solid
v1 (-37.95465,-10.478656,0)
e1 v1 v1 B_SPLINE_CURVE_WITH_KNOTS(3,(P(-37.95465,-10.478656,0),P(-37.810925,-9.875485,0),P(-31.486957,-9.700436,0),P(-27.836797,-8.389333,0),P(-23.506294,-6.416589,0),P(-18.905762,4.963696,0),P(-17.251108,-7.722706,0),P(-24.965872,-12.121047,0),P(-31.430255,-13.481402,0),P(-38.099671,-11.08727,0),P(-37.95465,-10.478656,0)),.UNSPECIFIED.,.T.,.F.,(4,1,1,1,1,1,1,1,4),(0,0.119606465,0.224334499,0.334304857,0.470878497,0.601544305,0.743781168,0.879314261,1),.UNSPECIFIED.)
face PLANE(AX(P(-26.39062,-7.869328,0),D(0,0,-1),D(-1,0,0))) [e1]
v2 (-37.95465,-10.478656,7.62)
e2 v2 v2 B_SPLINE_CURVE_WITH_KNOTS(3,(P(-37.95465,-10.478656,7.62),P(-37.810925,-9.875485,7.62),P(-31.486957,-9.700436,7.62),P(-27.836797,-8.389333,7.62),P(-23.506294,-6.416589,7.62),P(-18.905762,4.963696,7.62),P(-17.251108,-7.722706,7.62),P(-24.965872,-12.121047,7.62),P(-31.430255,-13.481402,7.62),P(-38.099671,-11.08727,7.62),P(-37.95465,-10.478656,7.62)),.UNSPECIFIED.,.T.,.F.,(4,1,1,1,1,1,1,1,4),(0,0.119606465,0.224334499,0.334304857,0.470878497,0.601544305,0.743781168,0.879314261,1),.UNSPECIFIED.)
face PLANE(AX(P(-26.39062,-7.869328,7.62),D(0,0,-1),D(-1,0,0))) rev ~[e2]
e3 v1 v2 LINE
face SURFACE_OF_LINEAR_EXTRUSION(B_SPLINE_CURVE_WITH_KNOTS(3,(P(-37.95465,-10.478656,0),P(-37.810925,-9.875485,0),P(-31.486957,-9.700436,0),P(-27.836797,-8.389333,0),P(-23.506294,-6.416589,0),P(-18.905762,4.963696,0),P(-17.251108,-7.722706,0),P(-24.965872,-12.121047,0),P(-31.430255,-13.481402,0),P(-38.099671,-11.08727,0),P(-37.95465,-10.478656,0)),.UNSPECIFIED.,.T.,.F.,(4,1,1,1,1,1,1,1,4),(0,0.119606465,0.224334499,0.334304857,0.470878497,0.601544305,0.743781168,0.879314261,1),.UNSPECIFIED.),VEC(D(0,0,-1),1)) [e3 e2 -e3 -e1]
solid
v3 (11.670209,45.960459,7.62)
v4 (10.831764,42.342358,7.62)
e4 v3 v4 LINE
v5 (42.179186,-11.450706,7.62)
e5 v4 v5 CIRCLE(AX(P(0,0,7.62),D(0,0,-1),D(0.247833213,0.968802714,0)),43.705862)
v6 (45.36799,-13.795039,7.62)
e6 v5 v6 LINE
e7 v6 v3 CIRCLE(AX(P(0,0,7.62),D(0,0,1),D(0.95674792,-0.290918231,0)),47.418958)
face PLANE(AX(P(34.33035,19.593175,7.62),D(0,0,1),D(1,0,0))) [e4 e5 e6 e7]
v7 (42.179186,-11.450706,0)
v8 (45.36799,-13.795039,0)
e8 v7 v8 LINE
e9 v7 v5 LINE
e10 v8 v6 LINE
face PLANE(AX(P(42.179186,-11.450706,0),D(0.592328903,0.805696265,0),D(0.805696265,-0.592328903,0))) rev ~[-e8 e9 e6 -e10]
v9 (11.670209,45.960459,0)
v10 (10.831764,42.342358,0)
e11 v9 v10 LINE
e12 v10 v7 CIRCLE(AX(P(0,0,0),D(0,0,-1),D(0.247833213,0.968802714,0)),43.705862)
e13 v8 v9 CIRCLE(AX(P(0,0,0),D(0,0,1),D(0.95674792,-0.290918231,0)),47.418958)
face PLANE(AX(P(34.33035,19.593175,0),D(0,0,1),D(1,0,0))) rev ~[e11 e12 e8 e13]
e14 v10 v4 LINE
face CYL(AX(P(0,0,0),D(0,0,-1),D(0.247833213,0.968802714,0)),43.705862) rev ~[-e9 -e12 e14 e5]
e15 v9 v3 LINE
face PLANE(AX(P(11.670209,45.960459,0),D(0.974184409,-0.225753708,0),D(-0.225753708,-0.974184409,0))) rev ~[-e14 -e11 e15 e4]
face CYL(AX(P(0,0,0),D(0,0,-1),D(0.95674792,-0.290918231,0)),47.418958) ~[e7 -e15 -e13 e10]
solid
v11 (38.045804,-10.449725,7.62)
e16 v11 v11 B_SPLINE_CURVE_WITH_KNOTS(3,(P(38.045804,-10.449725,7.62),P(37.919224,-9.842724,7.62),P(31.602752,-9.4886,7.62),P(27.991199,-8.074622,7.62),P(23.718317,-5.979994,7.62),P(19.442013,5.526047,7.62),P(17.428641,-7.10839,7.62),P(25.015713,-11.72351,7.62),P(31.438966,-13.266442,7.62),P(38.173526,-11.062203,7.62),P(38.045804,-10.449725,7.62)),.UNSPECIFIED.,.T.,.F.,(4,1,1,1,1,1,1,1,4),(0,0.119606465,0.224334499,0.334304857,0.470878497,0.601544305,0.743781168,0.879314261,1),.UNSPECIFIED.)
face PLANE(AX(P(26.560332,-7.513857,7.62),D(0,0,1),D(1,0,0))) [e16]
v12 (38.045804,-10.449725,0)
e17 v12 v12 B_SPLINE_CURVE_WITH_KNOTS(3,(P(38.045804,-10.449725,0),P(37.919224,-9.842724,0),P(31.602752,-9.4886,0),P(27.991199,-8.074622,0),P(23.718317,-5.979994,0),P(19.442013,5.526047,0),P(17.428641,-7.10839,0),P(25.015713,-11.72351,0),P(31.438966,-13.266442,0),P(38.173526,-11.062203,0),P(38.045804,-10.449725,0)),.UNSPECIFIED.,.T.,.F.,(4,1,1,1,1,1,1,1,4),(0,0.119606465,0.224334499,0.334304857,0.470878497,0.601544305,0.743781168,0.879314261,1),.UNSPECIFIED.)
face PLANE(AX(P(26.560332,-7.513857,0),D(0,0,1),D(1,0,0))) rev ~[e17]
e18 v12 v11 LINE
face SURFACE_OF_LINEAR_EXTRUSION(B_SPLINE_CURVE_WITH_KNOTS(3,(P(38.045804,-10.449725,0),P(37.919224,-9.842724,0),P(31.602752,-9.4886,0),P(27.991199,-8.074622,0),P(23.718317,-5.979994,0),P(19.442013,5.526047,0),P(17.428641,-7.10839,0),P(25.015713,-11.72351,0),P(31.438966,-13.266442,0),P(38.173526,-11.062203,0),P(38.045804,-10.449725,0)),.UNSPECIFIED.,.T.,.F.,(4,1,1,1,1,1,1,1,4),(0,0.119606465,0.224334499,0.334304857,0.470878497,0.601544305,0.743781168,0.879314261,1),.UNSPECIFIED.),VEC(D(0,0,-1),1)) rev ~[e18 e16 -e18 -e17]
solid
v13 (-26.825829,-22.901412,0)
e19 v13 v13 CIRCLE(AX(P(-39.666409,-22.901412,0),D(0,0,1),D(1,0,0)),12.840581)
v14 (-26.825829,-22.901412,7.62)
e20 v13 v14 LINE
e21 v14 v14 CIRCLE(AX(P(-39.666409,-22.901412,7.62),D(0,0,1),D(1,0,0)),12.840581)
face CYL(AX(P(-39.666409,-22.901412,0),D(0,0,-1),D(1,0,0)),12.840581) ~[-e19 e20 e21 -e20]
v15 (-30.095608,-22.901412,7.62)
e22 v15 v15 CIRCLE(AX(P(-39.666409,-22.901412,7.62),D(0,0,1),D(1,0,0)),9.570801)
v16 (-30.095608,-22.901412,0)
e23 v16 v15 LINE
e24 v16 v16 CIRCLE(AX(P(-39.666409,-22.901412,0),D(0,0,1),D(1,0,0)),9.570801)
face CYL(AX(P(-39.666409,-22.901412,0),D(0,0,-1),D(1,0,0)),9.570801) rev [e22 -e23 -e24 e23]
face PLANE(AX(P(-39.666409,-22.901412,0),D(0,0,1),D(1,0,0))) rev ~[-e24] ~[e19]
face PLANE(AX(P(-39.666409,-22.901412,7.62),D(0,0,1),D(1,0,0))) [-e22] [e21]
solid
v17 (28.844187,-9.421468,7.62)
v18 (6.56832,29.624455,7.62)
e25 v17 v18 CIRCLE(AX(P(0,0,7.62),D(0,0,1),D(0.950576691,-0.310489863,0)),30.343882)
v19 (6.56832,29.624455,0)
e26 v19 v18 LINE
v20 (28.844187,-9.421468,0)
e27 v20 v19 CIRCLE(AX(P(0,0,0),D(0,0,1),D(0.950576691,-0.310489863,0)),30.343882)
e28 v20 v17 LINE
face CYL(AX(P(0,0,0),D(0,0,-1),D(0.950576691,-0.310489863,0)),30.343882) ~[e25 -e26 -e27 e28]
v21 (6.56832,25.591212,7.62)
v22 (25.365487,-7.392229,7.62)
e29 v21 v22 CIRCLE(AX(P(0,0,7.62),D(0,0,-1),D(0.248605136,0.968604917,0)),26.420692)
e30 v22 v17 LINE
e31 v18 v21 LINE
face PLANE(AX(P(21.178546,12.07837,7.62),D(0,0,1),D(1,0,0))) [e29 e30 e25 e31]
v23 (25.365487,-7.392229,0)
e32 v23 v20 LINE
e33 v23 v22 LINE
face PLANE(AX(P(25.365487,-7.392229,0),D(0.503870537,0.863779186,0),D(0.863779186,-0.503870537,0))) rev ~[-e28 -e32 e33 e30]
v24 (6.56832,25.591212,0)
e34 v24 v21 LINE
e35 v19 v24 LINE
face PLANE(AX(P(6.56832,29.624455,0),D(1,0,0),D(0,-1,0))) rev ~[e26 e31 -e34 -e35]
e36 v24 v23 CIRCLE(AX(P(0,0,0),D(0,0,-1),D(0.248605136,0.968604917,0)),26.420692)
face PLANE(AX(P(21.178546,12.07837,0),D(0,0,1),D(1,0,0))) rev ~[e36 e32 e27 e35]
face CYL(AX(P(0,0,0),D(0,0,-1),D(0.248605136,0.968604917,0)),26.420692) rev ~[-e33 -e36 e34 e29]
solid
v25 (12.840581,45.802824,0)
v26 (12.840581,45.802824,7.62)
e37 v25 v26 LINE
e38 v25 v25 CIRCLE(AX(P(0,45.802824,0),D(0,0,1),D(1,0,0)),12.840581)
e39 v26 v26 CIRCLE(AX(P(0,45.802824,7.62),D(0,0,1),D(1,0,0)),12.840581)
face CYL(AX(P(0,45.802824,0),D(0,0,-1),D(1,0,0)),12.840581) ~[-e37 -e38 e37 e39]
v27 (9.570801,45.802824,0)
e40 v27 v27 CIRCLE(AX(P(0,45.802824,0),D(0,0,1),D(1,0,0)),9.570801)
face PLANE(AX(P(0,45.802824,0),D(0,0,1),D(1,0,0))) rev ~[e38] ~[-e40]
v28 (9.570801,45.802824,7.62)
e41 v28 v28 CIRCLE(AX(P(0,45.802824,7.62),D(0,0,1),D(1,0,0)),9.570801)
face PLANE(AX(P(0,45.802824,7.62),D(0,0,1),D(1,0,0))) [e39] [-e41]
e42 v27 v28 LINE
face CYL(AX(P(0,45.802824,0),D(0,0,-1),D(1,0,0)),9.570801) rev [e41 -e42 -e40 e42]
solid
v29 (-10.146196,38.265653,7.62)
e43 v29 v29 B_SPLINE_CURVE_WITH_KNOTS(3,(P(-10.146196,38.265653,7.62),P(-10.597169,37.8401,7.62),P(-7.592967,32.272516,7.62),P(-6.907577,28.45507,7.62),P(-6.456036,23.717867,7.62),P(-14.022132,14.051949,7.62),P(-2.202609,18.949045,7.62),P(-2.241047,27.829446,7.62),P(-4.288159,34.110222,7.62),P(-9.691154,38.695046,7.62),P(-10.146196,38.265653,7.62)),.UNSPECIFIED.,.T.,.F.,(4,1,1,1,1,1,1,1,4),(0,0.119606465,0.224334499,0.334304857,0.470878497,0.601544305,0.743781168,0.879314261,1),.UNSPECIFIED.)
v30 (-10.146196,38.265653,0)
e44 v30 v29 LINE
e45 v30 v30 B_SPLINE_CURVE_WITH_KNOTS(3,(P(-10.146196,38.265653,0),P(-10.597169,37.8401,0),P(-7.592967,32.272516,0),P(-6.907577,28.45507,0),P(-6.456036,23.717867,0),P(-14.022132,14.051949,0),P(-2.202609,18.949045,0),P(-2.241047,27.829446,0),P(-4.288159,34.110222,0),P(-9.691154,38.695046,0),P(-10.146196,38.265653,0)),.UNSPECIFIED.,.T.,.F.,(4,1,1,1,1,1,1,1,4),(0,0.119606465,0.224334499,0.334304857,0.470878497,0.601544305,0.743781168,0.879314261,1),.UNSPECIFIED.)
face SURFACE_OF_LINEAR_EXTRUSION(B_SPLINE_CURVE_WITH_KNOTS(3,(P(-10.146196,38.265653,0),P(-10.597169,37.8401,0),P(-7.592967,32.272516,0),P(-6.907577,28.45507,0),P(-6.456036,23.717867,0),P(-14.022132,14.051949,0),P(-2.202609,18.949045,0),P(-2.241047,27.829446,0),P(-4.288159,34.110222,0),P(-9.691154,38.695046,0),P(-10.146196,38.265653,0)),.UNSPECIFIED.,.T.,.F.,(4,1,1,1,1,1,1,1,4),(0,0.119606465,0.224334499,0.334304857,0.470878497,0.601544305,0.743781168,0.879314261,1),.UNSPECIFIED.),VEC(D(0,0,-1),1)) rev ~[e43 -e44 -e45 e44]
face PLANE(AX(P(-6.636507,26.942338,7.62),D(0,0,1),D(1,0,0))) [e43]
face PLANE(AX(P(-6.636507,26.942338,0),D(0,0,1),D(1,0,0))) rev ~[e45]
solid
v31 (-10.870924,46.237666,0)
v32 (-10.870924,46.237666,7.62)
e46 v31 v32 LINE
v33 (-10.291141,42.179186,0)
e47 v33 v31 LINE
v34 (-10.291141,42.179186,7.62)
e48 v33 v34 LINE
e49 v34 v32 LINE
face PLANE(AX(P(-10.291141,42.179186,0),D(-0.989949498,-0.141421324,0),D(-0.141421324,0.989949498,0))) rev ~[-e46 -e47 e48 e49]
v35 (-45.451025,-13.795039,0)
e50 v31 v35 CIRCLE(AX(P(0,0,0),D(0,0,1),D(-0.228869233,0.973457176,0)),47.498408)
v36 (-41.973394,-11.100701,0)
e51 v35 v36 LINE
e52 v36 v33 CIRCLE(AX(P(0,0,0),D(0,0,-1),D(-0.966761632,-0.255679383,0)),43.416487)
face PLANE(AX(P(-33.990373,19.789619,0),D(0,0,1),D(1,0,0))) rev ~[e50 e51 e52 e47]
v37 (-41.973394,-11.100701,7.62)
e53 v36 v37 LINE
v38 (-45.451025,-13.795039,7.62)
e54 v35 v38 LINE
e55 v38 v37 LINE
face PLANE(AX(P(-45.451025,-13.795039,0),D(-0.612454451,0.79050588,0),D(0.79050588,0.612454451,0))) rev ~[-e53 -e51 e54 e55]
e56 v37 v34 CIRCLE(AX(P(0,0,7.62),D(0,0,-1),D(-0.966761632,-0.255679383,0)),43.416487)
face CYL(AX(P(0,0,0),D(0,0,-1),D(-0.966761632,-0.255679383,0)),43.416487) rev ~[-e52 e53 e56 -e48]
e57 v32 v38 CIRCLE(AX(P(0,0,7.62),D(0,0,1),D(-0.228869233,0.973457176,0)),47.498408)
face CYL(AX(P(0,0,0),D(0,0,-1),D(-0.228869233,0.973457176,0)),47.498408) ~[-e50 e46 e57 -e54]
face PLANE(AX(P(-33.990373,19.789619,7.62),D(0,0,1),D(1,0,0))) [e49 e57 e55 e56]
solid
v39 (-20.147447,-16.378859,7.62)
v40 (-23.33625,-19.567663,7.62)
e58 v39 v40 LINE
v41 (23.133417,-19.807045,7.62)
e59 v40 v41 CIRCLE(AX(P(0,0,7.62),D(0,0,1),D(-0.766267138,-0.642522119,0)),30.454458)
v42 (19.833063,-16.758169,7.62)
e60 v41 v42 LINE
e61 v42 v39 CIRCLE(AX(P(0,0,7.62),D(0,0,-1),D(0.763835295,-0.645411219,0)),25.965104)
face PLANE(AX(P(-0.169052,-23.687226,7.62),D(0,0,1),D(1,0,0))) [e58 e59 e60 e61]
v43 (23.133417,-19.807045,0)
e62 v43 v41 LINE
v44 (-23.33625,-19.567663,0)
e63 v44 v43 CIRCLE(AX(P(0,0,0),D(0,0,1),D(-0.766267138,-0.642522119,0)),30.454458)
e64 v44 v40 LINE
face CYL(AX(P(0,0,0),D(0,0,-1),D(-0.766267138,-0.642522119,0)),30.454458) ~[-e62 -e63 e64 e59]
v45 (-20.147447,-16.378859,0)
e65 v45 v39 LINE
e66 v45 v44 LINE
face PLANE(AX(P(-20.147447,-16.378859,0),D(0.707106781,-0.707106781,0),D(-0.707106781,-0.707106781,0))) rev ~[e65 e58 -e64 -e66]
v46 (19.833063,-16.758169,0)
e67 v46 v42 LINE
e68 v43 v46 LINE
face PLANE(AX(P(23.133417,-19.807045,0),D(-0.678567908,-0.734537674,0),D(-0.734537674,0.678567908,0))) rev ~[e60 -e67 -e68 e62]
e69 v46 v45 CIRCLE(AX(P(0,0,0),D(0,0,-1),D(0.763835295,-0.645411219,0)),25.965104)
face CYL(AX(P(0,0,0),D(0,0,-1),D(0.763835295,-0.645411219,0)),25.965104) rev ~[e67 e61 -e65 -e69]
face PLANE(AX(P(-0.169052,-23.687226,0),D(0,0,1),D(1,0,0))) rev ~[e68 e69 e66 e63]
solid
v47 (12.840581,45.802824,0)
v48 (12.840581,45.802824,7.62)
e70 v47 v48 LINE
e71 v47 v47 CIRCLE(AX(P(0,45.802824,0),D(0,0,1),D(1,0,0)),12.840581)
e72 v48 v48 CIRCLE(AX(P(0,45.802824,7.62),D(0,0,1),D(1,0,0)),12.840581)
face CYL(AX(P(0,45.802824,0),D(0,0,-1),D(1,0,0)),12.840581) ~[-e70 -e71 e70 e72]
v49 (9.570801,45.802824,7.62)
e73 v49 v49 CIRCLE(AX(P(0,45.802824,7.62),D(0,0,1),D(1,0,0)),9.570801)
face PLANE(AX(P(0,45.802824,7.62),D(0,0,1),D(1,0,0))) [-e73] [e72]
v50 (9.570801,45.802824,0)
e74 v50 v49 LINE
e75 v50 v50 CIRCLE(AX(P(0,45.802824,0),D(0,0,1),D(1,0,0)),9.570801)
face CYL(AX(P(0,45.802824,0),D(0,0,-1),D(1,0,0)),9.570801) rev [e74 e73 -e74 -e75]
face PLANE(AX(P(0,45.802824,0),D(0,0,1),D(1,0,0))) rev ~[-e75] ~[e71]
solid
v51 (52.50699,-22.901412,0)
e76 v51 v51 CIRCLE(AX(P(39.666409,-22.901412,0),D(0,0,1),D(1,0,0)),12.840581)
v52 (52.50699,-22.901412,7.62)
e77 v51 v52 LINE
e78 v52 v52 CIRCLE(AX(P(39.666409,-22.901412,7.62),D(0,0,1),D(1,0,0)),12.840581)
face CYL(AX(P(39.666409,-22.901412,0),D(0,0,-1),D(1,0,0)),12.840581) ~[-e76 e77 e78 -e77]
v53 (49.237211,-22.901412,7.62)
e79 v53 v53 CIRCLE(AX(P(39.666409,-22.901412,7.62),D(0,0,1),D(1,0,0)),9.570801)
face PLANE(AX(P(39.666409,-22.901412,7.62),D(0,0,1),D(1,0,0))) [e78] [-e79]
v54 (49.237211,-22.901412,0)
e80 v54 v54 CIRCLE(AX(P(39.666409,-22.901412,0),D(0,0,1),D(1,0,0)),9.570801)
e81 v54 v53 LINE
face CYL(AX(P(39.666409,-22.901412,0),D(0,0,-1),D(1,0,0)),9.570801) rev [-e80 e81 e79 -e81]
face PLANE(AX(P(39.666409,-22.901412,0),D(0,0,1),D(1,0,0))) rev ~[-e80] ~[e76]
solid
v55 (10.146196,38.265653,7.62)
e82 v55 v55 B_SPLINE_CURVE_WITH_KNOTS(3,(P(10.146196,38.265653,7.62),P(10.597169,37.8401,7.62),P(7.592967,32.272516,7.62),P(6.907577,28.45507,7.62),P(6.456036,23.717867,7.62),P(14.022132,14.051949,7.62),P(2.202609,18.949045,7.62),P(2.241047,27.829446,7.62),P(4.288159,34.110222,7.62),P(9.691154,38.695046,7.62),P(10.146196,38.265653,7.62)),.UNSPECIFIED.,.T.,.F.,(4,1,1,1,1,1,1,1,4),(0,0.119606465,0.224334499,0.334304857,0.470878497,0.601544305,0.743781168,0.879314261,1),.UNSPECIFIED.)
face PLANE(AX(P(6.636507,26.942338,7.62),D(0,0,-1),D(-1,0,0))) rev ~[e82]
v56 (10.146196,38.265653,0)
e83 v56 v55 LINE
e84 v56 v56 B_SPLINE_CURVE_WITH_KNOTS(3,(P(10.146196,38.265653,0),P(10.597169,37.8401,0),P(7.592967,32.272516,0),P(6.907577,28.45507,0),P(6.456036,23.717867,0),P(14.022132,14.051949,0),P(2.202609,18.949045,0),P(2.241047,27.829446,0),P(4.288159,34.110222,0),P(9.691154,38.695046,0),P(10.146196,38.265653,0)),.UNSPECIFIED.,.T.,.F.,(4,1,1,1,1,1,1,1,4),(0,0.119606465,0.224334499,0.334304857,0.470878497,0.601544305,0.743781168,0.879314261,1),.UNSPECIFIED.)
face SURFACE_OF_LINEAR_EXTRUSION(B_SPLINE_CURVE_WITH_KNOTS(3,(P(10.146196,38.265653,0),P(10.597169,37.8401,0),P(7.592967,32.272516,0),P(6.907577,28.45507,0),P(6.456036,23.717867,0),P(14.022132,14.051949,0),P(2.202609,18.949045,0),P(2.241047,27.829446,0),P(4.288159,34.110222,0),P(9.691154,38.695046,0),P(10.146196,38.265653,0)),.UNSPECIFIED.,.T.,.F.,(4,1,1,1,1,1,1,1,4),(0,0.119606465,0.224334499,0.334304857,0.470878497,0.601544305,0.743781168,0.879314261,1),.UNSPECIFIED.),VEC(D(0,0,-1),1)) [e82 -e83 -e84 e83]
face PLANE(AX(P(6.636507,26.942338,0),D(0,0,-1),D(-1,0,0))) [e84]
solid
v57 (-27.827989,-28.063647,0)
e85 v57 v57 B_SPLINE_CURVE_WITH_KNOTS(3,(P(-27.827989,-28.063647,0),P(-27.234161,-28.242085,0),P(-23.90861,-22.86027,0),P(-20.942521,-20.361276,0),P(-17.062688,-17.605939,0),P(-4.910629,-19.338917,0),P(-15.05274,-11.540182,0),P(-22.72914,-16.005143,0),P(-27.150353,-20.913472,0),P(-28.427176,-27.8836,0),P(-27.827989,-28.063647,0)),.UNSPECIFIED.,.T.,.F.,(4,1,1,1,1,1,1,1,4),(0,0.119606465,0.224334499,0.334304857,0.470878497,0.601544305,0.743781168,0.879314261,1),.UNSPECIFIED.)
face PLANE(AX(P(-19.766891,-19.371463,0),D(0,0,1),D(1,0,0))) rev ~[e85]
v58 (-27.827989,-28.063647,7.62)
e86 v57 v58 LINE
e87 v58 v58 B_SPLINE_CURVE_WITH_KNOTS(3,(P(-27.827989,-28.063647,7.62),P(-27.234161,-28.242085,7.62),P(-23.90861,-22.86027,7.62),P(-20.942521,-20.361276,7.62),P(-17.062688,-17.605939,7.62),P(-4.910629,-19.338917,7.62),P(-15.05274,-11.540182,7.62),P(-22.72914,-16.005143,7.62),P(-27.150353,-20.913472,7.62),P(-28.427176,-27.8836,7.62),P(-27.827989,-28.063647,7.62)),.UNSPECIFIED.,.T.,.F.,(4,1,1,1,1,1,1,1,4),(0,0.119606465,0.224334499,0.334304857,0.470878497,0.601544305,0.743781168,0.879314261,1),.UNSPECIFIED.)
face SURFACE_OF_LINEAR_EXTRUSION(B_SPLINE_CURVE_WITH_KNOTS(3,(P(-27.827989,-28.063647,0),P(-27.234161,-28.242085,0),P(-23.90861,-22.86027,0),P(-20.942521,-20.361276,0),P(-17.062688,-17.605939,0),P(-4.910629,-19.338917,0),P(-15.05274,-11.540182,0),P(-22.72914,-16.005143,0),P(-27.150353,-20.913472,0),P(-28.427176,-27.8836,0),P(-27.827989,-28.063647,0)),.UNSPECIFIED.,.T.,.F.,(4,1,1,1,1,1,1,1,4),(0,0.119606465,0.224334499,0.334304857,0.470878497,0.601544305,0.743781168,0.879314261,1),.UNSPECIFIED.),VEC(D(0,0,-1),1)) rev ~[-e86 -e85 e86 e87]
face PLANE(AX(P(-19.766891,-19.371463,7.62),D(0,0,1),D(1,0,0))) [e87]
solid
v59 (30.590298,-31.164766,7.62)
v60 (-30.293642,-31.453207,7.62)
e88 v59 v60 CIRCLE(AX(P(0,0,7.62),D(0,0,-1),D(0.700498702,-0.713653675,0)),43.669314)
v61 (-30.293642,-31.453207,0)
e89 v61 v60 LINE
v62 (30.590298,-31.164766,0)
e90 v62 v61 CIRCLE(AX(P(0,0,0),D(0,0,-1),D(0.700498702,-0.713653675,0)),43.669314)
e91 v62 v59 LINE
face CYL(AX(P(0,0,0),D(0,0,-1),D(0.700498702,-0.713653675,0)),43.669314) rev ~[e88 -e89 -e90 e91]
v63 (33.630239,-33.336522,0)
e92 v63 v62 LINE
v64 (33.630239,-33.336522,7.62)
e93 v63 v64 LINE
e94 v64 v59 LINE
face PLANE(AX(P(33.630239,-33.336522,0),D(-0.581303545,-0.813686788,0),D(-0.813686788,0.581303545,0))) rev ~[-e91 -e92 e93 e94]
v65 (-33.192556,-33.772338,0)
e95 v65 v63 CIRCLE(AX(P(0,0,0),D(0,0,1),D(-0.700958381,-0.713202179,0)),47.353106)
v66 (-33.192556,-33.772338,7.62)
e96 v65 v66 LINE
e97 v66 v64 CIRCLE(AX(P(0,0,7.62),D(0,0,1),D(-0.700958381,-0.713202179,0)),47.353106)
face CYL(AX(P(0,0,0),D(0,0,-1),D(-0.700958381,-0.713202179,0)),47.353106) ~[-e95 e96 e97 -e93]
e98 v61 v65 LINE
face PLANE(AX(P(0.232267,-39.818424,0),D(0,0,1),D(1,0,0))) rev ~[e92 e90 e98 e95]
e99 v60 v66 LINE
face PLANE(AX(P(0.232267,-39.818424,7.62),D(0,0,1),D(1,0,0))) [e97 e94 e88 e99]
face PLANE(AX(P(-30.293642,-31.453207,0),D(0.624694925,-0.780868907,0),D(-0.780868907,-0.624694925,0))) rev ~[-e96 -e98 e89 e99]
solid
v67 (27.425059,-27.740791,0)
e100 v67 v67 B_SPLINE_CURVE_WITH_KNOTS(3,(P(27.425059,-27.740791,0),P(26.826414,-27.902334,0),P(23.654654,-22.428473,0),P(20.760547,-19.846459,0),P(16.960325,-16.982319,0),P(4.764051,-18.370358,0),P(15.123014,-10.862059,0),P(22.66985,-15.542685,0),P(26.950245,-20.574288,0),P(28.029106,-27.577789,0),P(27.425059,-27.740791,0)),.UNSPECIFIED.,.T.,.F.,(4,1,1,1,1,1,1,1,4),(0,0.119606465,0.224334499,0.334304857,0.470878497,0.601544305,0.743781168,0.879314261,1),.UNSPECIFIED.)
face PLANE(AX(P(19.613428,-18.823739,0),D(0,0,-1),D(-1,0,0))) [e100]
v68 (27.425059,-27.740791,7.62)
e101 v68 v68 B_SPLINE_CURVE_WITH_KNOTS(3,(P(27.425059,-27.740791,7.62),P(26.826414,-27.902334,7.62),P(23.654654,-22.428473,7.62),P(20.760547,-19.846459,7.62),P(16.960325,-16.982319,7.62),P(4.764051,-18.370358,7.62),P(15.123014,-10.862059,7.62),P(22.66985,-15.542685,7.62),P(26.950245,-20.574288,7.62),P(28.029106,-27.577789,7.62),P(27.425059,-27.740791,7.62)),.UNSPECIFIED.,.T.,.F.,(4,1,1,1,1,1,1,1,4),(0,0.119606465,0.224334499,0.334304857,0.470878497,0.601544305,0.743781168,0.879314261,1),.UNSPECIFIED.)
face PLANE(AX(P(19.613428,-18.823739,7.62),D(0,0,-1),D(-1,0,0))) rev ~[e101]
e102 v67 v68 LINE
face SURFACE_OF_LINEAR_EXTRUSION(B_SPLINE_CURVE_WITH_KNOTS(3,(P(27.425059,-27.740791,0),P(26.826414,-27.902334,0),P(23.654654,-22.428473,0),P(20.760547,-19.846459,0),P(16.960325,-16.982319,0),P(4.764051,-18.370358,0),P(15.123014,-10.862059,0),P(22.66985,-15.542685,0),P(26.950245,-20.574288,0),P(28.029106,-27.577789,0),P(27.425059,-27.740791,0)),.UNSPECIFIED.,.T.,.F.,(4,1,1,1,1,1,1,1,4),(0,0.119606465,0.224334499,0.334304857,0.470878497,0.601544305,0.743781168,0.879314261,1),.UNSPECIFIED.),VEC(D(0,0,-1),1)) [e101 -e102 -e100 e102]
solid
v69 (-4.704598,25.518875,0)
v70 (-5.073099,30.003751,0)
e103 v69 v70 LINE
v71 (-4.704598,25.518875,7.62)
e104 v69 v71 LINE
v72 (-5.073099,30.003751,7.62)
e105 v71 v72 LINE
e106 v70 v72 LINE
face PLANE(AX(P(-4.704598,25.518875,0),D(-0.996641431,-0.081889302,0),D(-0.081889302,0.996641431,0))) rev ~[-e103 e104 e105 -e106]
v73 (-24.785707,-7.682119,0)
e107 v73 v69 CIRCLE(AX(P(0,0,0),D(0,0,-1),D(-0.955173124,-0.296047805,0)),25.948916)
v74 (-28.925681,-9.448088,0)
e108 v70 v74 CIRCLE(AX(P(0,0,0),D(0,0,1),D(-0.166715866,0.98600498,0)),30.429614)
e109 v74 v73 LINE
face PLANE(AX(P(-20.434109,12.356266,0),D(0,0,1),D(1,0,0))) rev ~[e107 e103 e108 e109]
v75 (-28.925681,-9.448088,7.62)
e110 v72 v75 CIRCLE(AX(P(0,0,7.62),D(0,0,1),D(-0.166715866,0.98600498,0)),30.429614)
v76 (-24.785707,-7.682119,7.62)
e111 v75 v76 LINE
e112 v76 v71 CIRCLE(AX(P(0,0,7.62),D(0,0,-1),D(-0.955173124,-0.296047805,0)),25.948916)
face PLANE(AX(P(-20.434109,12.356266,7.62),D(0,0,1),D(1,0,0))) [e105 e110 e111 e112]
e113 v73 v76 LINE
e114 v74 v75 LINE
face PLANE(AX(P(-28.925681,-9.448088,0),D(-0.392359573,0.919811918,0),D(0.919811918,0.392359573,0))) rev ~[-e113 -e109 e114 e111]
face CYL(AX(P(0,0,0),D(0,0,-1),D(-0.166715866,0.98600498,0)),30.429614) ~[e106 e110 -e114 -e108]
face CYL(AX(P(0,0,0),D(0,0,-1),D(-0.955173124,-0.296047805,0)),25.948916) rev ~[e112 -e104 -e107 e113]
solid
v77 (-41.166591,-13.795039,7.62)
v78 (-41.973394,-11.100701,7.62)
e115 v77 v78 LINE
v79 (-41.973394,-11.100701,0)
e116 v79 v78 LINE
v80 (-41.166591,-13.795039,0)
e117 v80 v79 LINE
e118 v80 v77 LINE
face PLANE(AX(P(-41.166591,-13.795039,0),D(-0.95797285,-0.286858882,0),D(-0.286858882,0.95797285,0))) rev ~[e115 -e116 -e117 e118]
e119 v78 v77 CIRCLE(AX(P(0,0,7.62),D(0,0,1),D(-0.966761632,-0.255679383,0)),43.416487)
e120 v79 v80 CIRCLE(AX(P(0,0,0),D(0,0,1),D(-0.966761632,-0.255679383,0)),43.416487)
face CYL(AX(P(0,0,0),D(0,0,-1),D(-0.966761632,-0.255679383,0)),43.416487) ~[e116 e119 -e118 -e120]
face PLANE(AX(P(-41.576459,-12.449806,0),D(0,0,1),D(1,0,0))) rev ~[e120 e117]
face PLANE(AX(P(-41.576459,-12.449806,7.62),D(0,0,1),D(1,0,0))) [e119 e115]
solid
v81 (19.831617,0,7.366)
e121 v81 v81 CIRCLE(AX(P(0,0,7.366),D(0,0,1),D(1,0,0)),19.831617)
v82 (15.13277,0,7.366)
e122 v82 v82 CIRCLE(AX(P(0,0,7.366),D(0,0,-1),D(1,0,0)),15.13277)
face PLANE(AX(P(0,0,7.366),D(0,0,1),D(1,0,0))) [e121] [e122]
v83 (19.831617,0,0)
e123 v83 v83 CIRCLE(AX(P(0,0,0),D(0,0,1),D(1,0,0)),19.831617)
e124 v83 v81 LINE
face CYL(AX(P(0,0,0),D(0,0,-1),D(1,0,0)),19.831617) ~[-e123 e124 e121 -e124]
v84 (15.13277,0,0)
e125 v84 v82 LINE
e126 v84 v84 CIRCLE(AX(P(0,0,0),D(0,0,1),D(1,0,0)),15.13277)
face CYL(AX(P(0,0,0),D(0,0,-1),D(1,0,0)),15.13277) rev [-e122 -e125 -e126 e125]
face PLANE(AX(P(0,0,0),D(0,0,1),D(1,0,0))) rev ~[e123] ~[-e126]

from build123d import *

# Parameters (mm, degrees)
F0_R      = 19.8316168412
F1_DEPTH  = 7.366
F2_R      = 15.1327699345
F3_DEPTH  = 8.89
F4_R      = 12.8405806387
F4_R_2    = 9.5708012392
F5_DEPTH  = 7.62
F7_DEPTH  = 7.62
F8_DEPTH  = 7.62
F10_DEPTH = 7.62
F12_DEPTH = 7.62


# Not quite as in the source:
# - a feature of the source that left no trace in its solid (it failed there, or was rolled back) is left out
# - a feature names something its author has since deleted; it is built from what else it names


with BuildPart() as f1:
    # F0 (on Top) → F1 (new body)
    with BuildSketch(Plane.XY):
        Circle(F0_R)
    extrude(amount=F1_DEPTH)

    # F2 (on Top) → F3 (cut)
    with BuildSketch(Plane.XY):
        Circle(F2_R)
    extrude(amount=F3_DEPTH, mode=Mode.SUBTRACT)


with BuildPart() as f5:
    # F4 (on Top) → F5 (new body)
    with BuildSketch(Plane.XY):
        with Locations((0, 45.8028241992)):
            Circle(F4_R)
        with Locations((0, 45.8028241992)):
            Circle(F4_R_2, mode=Mode.SUBTRACT)
    extrude(amount=F5_DEPTH)


with BuildPart() as f7:
    # F6 (on Top) → F7 (new body)
    with BuildSketch(Plane.XY):
        with BuildLine():
            add(Edge.make_bspline(
                [(-10.1461960003, 38.2656529546), (-10.5971686857, 37.8400995519), (-7.5929666267, 32.2725156605), (-6.9075768698, 28.4550696213), (-6.4560361932, 23.7178665225), (-14.0221319892, 14.0519491431), (-2.2026089144, 18.9490453351), (-2.2410472149, 27.8294457935), (-4.2881589957, 34.1102219148), (-9.6911539418, 38.6950463582), (-10.1461960003, 38.2656529546)],
                knots=[0, 0, 0, 0, 0.1196064646, 0.2243344987, 0.3343048571, 0.4708784974, 0.6015443046, 0.7437811682, 0.8793142609, 1, 1, 1, 1], degree=3))
        make_face()
    extrude(amount=F7_DEPTH)


with BuildPart() as f7b:
    # F6 (on Top) → F7, piece 2 (new body)
    with BuildSketch(Plane.XY):
        with BuildLine():
            add(Edge.make_bspline(
                [(10.1461960003, 38.2656529546), (10.5971686857, 37.8400995519), (7.5929666267, 32.2725156605), (6.9075768698, 28.4550696213), (6.4560361932, 23.7178665225), (14.0221319892, 14.0519491431), (2.2026089144, 18.9490453351), (2.2410472149, 27.8294457935), (4.2881589957, 34.1102219148), (9.6911539418, 38.6950463582), (10.1461960003, 38.2656529546)],
                knots=[0, 0, 0, 0, 0.1196064646, 0.2243344987, 0.3343048571, 0.4708784974, 0.6015443046, 0.7437811682, 0.8793142609, 1, 1, 1, 1], degree=3))
        make_face()
    extrude(amount=F7_DEPTH)


with BuildPart() as f7c:
    # F6 (on Top) → F7, piece 3 (new body)
    with BuildSketch(Plane.XY):
        with BuildLine():
            add(Edge.make_bspline(
                [(38.0458038622, -10.4497247993), (37.9192240951, -9.8427242852), (31.6027522683, -9.488599928), (27.9911987139, -8.074621744), (23.7183170825, -5.9799941528), (19.4420127466, 5.5260471128), (17.4286413404, -7.1083904453), (25.0157130247, -11.7235104937), (31.4389658818, -13.2664421394), (38.1735258277, -11.0622026108), (38.0458038622, -10.4497247993)],
                knots=[0, 0, 0, 0, 0.1196064646, 0.2243344987, 0.3343048571, 0.4708784974, 0.6015443046, 0.7437811682, 0.8793142609, 1, 1, 1, 1], degree=3))
        make_face()
    extrude(amount=F7_DEPTH)


with BuildPart() as f7d:
    # F6 (on Top) → F7, piece 4 (new body)
    with BuildSketch(Plane.XY):
        with BuildLine():
            add(Edge.make_bspline(
                [(27.4250593609, -27.7407906815), (26.8264144307, -27.9023342025), (23.6546544249, -22.4284727808), (20.7605470435, -19.8464588679), (16.9603251319, -16.9823192757), (4.7640505609, -18.3703578085), (15.1230140377, -10.862058899), (22.6698496209, -15.542685191), (26.9502450772, -20.5742883219), (28.0291061914, -27.577789465), (27.4250593609, -27.7407906815)],
                knots=[0, 0, 0, 0, 0.1196064646, 0.2243344987, 0.3343048571, 0.4708784974, 0.6015443046, 0.7437811682, 0.8793142609, 1, 1, 1, 1], degree=3))
        make_face()
    extrude(amount=F7_DEPTH)


with BuildPart() as f7e:
    # F6 (on Top) → F7, piece 5 (new body)
    with BuildSketch(Plane.XY):
        with BuildLine():
            add(Edge.make_bspline(
                [(-27.82798931, -28.063647449), (-27.2341608386, -28.2420845754), (-23.9086099711, -22.860269656), (-20.9425206648, -20.361276337), (-17.0626884028, -17.6059390074), (-4.9106288404, -19.338917014), (-15.0527396932, -11.540182227), (-22.729139541, -16.0051430533), (-27.1503526326, -20.9134717024), (-28.4271762203, -27.8836001869), (-27.82798931, -28.063647449)],
                knots=[0, 0, 0, 0, 0.1196064646, 0.2243344987, 0.3343048571, 0.4708784974, 0.6015443046, 0.7437811682, 0.8793142609, 1, 1, 1, 1], degree=3))
        make_face()
    extrude(amount=F7_DEPTH)


with BuildPart() as f7f:
    # F6 (on Top) → F7, piece 6 (new body)
    with BuildSketch(Plane.XY):
        with BuildLine():
            add(Edge.make_bspline(
                [(-37.9546495422, -10.4786559606), (-37.8109254408, -9.8754848039), (-31.4869568886, -9.700435813), (-27.8367974939, -8.3893333095), (-23.5062939642, -6.416588683), (-18.9057622264, 4.9636956767), (-17.2511076431, -7.722706297), (-24.9658717812, -12.1210473589), (-31.4302550876, -13.48140165), (-38.0996705446, -11.0872698603), (-37.9546495422, -10.4786559606)],
                knots=[0, 0, 0, 0, 0.1196064646, 0.2243344987, 0.3343048571, 0.4708784974, 0.6015443046, 0.7437811682, 0.8793142609, 1, 1, 1, 1], degree=3))
        make_face()
    extrude(amount=F7_DEPTH)


with BuildPart() as f8:
    # F4 (on Top) → F8 (new body)
    with BuildSketch(Plane.XY):
        with Locations((0, 45.8028241992)):
            Circle(F4_R)
        with Locations((0, 45.8028241992)):
            Circle(F4_R_2, mode=Mode.SUBTRACT)
    extrude(amount=F8_DEPTH)


with BuildPart() as f8b:
    # F4 (on Top) → F8, piece 2 (new body)
    with BuildSketch(Plane.XY):
        with Locations((-39.6664093216, -22.9014120996)):
            Circle(F4_R)
        with Locations((-39.6664093216, -22.9014120996)):
            Circle(F4_R_2, mode=Mode.SUBTRACT)
    extrude(amount=F8_DEPTH)


with BuildPart() as f8c:
    # F4 (on Top) → F8, piece 3 (new body)
    with BuildSketch(Plane.XY):
        with Locations((39.6664093216, -22.9014120996)):
            Circle(F4_R)
        with Locations((39.6664093216, -22.9014120996)):
            Circle(F4_R_2, mode=Mode.SUBTRACT)
    extrude(amount=F8_DEPTH)


with BuildPart() as f10:
    # F9 (on Top) → F10 (new body)
    with BuildSketch(Plane.XY):
        with BuildLine():
            Line((-4.7045984098, 25.5188748579), (-5.0730993971, 30.0037506968))
            ThreePointArc((-5.0730993971, 30.0037506968), (-26.0401835333, 15.7438951635), (-28.9256811899, -9.4480876938))
            Line((-28.9256811899, -9.4480876938), (-24.7857067734, -7.6821194962))
            ThreePointArc((-24.7857067734, -7.6821194962), (-22.2035139443, 13.4294522873), (-4.7045984098, 25.5188748579))
        make_face()
    extrude(amount=F10_DEPTH)


with BuildPart() as f10b:
    # F9 (on Top) → F10, piece 2 (new body)
    with BuildSketch(Plane.XY):
        with BuildLine():
            Line((-20.147446543, -16.378859058), (-23.336250335, -19.56766285))
            ThreePointArc((-23.336250335, -19.56766285), (-0.1568800839, -30.4540538804), (23.133416665, -19.8070452747))
            Line((23.133416665, -19.8070452747), (19.8330628805, -16.7581694413))
            ThreePointArc((19.8330628805, -16.7581694413), (-0.2463297861, -25.9639355237), (-20.147446543, -16.378859058))
        make_face()
    extrude(amount=F10_DEPTH)


with BuildPart() as f10c:
    # F9 (on Top) → F10, piece 3 (new body)
    with BuildSketch(Plane.XY):
        with BuildLine():
            Line((25.3654867411, -7.392228581), (28.8441870362, -9.4214677811))
            ThreePointArc((28.8441870362, -9.4214677811), (26.3563547864, 15.036413911), (6.5683197142, 29.6244553884))
            Line((6.5683197142, 29.6244553884), (6.5683197142, 25.5912121076))
            ThreePointArc((6.5683197142, 25.5912121076), (22.9547127753, 13.081824124), (25.3654867411, -7.392228581))
        make_face()
    extrude(amount=F10_DEPTH)


with BuildPart() as f12:
    # F11 (on Top) → F12 (new body)
    with BuildSketch(Plane.XY):
        with BuildLine():
            Line((-10.2911414579, 42.1791858971), (-10.8709242195, 46.2376661599))
            ThreePointArc((-10.8709242195, 46.2376661599), (-41.1584975389, 23.7081598956), (-45.4510247658, -13.7950394358))
            Line((-45.4510247658, -13.7950394358), (-41.9733935129, -11.100700539))
            ThreePointArc((-41.9733935129, -11.100700539), (-37.3173147291, 22.1902982598), (-10.2911414579, 42.1791858971))
        make_face()
    extrude(amount=F12_DEPTH)


with BuildPart() as f12b:
    # F11 (on Top) → F12, piece 2 (new body)
    with BuildSketch(Plane.XY):
        with BuildLine():
            Line((-41.1665908524, -13.7950394358), (-41.9733935129, -11.100700539))
            ThreePointArc((-41.9733935129, -11.100700539), (-41.591815488, -12.4544048375), (-41.1665908524, -13.7950394358))
        make_face()
    extrude(amount=F12_DEPTH)


with BuildPart() as f12c:
    # F11 (on Top) → F12, piece 3 (new body)
    with BuildSketch(Plane.XY):
        with BuildLine():
            Line((-30.2936416119, -31.4532071352), (-33.1925563514, -33.7723381817))
            ThreePointArc((-33.1925563514, -33.7723381817), (0.3088292617, -47.3520986641), (33.6302387387, -33.3365215009))
            Line((33.6302387387, -33.3365215009), (30.5902975902, -31.164766236))
            ThreePointArc((30.5902975902, -31.164766236), (0.206883374, -43.6688236671), (-30.2936416119, -31.4532071352))
        make_face()
    extrude(amount=F12_DEPTH)


with BuildPart() as f12d:
    # F11 (on Top) → F12, piece 4 (new body)
    with BuildSketch(Plane.XY):
        with BuildLine():
            Line((42.1791858971, -11.4507060498), (45.3679896891, -13.7950394358))
            ThreePointArc((45.3679896891, -13.7950394358), (41.3039820945, 23.2924593937), (11.6702090357, 45.9604593377))
            Line((11.6702090357, 45.9604593377), (10.8317642781, 42.3423579245))
            ThreePointArc((10.8317642781, 42.3423579245), (37.7619337767, 22.0054254544), (42.1791858971, -11.4507060498))
        make_face()
    extrude(amount=F12_DEPTH)


solid = Compound([f1.part, f5.part, f7.part, f7b.part, f7c.part, f7d.part, f7e.part, f7f.part, f8.part, f8b.part, f8c.part, f10.part, f10b.part, f10c.part, f12.part, f12b.part, f12c.part, f12d.part])
